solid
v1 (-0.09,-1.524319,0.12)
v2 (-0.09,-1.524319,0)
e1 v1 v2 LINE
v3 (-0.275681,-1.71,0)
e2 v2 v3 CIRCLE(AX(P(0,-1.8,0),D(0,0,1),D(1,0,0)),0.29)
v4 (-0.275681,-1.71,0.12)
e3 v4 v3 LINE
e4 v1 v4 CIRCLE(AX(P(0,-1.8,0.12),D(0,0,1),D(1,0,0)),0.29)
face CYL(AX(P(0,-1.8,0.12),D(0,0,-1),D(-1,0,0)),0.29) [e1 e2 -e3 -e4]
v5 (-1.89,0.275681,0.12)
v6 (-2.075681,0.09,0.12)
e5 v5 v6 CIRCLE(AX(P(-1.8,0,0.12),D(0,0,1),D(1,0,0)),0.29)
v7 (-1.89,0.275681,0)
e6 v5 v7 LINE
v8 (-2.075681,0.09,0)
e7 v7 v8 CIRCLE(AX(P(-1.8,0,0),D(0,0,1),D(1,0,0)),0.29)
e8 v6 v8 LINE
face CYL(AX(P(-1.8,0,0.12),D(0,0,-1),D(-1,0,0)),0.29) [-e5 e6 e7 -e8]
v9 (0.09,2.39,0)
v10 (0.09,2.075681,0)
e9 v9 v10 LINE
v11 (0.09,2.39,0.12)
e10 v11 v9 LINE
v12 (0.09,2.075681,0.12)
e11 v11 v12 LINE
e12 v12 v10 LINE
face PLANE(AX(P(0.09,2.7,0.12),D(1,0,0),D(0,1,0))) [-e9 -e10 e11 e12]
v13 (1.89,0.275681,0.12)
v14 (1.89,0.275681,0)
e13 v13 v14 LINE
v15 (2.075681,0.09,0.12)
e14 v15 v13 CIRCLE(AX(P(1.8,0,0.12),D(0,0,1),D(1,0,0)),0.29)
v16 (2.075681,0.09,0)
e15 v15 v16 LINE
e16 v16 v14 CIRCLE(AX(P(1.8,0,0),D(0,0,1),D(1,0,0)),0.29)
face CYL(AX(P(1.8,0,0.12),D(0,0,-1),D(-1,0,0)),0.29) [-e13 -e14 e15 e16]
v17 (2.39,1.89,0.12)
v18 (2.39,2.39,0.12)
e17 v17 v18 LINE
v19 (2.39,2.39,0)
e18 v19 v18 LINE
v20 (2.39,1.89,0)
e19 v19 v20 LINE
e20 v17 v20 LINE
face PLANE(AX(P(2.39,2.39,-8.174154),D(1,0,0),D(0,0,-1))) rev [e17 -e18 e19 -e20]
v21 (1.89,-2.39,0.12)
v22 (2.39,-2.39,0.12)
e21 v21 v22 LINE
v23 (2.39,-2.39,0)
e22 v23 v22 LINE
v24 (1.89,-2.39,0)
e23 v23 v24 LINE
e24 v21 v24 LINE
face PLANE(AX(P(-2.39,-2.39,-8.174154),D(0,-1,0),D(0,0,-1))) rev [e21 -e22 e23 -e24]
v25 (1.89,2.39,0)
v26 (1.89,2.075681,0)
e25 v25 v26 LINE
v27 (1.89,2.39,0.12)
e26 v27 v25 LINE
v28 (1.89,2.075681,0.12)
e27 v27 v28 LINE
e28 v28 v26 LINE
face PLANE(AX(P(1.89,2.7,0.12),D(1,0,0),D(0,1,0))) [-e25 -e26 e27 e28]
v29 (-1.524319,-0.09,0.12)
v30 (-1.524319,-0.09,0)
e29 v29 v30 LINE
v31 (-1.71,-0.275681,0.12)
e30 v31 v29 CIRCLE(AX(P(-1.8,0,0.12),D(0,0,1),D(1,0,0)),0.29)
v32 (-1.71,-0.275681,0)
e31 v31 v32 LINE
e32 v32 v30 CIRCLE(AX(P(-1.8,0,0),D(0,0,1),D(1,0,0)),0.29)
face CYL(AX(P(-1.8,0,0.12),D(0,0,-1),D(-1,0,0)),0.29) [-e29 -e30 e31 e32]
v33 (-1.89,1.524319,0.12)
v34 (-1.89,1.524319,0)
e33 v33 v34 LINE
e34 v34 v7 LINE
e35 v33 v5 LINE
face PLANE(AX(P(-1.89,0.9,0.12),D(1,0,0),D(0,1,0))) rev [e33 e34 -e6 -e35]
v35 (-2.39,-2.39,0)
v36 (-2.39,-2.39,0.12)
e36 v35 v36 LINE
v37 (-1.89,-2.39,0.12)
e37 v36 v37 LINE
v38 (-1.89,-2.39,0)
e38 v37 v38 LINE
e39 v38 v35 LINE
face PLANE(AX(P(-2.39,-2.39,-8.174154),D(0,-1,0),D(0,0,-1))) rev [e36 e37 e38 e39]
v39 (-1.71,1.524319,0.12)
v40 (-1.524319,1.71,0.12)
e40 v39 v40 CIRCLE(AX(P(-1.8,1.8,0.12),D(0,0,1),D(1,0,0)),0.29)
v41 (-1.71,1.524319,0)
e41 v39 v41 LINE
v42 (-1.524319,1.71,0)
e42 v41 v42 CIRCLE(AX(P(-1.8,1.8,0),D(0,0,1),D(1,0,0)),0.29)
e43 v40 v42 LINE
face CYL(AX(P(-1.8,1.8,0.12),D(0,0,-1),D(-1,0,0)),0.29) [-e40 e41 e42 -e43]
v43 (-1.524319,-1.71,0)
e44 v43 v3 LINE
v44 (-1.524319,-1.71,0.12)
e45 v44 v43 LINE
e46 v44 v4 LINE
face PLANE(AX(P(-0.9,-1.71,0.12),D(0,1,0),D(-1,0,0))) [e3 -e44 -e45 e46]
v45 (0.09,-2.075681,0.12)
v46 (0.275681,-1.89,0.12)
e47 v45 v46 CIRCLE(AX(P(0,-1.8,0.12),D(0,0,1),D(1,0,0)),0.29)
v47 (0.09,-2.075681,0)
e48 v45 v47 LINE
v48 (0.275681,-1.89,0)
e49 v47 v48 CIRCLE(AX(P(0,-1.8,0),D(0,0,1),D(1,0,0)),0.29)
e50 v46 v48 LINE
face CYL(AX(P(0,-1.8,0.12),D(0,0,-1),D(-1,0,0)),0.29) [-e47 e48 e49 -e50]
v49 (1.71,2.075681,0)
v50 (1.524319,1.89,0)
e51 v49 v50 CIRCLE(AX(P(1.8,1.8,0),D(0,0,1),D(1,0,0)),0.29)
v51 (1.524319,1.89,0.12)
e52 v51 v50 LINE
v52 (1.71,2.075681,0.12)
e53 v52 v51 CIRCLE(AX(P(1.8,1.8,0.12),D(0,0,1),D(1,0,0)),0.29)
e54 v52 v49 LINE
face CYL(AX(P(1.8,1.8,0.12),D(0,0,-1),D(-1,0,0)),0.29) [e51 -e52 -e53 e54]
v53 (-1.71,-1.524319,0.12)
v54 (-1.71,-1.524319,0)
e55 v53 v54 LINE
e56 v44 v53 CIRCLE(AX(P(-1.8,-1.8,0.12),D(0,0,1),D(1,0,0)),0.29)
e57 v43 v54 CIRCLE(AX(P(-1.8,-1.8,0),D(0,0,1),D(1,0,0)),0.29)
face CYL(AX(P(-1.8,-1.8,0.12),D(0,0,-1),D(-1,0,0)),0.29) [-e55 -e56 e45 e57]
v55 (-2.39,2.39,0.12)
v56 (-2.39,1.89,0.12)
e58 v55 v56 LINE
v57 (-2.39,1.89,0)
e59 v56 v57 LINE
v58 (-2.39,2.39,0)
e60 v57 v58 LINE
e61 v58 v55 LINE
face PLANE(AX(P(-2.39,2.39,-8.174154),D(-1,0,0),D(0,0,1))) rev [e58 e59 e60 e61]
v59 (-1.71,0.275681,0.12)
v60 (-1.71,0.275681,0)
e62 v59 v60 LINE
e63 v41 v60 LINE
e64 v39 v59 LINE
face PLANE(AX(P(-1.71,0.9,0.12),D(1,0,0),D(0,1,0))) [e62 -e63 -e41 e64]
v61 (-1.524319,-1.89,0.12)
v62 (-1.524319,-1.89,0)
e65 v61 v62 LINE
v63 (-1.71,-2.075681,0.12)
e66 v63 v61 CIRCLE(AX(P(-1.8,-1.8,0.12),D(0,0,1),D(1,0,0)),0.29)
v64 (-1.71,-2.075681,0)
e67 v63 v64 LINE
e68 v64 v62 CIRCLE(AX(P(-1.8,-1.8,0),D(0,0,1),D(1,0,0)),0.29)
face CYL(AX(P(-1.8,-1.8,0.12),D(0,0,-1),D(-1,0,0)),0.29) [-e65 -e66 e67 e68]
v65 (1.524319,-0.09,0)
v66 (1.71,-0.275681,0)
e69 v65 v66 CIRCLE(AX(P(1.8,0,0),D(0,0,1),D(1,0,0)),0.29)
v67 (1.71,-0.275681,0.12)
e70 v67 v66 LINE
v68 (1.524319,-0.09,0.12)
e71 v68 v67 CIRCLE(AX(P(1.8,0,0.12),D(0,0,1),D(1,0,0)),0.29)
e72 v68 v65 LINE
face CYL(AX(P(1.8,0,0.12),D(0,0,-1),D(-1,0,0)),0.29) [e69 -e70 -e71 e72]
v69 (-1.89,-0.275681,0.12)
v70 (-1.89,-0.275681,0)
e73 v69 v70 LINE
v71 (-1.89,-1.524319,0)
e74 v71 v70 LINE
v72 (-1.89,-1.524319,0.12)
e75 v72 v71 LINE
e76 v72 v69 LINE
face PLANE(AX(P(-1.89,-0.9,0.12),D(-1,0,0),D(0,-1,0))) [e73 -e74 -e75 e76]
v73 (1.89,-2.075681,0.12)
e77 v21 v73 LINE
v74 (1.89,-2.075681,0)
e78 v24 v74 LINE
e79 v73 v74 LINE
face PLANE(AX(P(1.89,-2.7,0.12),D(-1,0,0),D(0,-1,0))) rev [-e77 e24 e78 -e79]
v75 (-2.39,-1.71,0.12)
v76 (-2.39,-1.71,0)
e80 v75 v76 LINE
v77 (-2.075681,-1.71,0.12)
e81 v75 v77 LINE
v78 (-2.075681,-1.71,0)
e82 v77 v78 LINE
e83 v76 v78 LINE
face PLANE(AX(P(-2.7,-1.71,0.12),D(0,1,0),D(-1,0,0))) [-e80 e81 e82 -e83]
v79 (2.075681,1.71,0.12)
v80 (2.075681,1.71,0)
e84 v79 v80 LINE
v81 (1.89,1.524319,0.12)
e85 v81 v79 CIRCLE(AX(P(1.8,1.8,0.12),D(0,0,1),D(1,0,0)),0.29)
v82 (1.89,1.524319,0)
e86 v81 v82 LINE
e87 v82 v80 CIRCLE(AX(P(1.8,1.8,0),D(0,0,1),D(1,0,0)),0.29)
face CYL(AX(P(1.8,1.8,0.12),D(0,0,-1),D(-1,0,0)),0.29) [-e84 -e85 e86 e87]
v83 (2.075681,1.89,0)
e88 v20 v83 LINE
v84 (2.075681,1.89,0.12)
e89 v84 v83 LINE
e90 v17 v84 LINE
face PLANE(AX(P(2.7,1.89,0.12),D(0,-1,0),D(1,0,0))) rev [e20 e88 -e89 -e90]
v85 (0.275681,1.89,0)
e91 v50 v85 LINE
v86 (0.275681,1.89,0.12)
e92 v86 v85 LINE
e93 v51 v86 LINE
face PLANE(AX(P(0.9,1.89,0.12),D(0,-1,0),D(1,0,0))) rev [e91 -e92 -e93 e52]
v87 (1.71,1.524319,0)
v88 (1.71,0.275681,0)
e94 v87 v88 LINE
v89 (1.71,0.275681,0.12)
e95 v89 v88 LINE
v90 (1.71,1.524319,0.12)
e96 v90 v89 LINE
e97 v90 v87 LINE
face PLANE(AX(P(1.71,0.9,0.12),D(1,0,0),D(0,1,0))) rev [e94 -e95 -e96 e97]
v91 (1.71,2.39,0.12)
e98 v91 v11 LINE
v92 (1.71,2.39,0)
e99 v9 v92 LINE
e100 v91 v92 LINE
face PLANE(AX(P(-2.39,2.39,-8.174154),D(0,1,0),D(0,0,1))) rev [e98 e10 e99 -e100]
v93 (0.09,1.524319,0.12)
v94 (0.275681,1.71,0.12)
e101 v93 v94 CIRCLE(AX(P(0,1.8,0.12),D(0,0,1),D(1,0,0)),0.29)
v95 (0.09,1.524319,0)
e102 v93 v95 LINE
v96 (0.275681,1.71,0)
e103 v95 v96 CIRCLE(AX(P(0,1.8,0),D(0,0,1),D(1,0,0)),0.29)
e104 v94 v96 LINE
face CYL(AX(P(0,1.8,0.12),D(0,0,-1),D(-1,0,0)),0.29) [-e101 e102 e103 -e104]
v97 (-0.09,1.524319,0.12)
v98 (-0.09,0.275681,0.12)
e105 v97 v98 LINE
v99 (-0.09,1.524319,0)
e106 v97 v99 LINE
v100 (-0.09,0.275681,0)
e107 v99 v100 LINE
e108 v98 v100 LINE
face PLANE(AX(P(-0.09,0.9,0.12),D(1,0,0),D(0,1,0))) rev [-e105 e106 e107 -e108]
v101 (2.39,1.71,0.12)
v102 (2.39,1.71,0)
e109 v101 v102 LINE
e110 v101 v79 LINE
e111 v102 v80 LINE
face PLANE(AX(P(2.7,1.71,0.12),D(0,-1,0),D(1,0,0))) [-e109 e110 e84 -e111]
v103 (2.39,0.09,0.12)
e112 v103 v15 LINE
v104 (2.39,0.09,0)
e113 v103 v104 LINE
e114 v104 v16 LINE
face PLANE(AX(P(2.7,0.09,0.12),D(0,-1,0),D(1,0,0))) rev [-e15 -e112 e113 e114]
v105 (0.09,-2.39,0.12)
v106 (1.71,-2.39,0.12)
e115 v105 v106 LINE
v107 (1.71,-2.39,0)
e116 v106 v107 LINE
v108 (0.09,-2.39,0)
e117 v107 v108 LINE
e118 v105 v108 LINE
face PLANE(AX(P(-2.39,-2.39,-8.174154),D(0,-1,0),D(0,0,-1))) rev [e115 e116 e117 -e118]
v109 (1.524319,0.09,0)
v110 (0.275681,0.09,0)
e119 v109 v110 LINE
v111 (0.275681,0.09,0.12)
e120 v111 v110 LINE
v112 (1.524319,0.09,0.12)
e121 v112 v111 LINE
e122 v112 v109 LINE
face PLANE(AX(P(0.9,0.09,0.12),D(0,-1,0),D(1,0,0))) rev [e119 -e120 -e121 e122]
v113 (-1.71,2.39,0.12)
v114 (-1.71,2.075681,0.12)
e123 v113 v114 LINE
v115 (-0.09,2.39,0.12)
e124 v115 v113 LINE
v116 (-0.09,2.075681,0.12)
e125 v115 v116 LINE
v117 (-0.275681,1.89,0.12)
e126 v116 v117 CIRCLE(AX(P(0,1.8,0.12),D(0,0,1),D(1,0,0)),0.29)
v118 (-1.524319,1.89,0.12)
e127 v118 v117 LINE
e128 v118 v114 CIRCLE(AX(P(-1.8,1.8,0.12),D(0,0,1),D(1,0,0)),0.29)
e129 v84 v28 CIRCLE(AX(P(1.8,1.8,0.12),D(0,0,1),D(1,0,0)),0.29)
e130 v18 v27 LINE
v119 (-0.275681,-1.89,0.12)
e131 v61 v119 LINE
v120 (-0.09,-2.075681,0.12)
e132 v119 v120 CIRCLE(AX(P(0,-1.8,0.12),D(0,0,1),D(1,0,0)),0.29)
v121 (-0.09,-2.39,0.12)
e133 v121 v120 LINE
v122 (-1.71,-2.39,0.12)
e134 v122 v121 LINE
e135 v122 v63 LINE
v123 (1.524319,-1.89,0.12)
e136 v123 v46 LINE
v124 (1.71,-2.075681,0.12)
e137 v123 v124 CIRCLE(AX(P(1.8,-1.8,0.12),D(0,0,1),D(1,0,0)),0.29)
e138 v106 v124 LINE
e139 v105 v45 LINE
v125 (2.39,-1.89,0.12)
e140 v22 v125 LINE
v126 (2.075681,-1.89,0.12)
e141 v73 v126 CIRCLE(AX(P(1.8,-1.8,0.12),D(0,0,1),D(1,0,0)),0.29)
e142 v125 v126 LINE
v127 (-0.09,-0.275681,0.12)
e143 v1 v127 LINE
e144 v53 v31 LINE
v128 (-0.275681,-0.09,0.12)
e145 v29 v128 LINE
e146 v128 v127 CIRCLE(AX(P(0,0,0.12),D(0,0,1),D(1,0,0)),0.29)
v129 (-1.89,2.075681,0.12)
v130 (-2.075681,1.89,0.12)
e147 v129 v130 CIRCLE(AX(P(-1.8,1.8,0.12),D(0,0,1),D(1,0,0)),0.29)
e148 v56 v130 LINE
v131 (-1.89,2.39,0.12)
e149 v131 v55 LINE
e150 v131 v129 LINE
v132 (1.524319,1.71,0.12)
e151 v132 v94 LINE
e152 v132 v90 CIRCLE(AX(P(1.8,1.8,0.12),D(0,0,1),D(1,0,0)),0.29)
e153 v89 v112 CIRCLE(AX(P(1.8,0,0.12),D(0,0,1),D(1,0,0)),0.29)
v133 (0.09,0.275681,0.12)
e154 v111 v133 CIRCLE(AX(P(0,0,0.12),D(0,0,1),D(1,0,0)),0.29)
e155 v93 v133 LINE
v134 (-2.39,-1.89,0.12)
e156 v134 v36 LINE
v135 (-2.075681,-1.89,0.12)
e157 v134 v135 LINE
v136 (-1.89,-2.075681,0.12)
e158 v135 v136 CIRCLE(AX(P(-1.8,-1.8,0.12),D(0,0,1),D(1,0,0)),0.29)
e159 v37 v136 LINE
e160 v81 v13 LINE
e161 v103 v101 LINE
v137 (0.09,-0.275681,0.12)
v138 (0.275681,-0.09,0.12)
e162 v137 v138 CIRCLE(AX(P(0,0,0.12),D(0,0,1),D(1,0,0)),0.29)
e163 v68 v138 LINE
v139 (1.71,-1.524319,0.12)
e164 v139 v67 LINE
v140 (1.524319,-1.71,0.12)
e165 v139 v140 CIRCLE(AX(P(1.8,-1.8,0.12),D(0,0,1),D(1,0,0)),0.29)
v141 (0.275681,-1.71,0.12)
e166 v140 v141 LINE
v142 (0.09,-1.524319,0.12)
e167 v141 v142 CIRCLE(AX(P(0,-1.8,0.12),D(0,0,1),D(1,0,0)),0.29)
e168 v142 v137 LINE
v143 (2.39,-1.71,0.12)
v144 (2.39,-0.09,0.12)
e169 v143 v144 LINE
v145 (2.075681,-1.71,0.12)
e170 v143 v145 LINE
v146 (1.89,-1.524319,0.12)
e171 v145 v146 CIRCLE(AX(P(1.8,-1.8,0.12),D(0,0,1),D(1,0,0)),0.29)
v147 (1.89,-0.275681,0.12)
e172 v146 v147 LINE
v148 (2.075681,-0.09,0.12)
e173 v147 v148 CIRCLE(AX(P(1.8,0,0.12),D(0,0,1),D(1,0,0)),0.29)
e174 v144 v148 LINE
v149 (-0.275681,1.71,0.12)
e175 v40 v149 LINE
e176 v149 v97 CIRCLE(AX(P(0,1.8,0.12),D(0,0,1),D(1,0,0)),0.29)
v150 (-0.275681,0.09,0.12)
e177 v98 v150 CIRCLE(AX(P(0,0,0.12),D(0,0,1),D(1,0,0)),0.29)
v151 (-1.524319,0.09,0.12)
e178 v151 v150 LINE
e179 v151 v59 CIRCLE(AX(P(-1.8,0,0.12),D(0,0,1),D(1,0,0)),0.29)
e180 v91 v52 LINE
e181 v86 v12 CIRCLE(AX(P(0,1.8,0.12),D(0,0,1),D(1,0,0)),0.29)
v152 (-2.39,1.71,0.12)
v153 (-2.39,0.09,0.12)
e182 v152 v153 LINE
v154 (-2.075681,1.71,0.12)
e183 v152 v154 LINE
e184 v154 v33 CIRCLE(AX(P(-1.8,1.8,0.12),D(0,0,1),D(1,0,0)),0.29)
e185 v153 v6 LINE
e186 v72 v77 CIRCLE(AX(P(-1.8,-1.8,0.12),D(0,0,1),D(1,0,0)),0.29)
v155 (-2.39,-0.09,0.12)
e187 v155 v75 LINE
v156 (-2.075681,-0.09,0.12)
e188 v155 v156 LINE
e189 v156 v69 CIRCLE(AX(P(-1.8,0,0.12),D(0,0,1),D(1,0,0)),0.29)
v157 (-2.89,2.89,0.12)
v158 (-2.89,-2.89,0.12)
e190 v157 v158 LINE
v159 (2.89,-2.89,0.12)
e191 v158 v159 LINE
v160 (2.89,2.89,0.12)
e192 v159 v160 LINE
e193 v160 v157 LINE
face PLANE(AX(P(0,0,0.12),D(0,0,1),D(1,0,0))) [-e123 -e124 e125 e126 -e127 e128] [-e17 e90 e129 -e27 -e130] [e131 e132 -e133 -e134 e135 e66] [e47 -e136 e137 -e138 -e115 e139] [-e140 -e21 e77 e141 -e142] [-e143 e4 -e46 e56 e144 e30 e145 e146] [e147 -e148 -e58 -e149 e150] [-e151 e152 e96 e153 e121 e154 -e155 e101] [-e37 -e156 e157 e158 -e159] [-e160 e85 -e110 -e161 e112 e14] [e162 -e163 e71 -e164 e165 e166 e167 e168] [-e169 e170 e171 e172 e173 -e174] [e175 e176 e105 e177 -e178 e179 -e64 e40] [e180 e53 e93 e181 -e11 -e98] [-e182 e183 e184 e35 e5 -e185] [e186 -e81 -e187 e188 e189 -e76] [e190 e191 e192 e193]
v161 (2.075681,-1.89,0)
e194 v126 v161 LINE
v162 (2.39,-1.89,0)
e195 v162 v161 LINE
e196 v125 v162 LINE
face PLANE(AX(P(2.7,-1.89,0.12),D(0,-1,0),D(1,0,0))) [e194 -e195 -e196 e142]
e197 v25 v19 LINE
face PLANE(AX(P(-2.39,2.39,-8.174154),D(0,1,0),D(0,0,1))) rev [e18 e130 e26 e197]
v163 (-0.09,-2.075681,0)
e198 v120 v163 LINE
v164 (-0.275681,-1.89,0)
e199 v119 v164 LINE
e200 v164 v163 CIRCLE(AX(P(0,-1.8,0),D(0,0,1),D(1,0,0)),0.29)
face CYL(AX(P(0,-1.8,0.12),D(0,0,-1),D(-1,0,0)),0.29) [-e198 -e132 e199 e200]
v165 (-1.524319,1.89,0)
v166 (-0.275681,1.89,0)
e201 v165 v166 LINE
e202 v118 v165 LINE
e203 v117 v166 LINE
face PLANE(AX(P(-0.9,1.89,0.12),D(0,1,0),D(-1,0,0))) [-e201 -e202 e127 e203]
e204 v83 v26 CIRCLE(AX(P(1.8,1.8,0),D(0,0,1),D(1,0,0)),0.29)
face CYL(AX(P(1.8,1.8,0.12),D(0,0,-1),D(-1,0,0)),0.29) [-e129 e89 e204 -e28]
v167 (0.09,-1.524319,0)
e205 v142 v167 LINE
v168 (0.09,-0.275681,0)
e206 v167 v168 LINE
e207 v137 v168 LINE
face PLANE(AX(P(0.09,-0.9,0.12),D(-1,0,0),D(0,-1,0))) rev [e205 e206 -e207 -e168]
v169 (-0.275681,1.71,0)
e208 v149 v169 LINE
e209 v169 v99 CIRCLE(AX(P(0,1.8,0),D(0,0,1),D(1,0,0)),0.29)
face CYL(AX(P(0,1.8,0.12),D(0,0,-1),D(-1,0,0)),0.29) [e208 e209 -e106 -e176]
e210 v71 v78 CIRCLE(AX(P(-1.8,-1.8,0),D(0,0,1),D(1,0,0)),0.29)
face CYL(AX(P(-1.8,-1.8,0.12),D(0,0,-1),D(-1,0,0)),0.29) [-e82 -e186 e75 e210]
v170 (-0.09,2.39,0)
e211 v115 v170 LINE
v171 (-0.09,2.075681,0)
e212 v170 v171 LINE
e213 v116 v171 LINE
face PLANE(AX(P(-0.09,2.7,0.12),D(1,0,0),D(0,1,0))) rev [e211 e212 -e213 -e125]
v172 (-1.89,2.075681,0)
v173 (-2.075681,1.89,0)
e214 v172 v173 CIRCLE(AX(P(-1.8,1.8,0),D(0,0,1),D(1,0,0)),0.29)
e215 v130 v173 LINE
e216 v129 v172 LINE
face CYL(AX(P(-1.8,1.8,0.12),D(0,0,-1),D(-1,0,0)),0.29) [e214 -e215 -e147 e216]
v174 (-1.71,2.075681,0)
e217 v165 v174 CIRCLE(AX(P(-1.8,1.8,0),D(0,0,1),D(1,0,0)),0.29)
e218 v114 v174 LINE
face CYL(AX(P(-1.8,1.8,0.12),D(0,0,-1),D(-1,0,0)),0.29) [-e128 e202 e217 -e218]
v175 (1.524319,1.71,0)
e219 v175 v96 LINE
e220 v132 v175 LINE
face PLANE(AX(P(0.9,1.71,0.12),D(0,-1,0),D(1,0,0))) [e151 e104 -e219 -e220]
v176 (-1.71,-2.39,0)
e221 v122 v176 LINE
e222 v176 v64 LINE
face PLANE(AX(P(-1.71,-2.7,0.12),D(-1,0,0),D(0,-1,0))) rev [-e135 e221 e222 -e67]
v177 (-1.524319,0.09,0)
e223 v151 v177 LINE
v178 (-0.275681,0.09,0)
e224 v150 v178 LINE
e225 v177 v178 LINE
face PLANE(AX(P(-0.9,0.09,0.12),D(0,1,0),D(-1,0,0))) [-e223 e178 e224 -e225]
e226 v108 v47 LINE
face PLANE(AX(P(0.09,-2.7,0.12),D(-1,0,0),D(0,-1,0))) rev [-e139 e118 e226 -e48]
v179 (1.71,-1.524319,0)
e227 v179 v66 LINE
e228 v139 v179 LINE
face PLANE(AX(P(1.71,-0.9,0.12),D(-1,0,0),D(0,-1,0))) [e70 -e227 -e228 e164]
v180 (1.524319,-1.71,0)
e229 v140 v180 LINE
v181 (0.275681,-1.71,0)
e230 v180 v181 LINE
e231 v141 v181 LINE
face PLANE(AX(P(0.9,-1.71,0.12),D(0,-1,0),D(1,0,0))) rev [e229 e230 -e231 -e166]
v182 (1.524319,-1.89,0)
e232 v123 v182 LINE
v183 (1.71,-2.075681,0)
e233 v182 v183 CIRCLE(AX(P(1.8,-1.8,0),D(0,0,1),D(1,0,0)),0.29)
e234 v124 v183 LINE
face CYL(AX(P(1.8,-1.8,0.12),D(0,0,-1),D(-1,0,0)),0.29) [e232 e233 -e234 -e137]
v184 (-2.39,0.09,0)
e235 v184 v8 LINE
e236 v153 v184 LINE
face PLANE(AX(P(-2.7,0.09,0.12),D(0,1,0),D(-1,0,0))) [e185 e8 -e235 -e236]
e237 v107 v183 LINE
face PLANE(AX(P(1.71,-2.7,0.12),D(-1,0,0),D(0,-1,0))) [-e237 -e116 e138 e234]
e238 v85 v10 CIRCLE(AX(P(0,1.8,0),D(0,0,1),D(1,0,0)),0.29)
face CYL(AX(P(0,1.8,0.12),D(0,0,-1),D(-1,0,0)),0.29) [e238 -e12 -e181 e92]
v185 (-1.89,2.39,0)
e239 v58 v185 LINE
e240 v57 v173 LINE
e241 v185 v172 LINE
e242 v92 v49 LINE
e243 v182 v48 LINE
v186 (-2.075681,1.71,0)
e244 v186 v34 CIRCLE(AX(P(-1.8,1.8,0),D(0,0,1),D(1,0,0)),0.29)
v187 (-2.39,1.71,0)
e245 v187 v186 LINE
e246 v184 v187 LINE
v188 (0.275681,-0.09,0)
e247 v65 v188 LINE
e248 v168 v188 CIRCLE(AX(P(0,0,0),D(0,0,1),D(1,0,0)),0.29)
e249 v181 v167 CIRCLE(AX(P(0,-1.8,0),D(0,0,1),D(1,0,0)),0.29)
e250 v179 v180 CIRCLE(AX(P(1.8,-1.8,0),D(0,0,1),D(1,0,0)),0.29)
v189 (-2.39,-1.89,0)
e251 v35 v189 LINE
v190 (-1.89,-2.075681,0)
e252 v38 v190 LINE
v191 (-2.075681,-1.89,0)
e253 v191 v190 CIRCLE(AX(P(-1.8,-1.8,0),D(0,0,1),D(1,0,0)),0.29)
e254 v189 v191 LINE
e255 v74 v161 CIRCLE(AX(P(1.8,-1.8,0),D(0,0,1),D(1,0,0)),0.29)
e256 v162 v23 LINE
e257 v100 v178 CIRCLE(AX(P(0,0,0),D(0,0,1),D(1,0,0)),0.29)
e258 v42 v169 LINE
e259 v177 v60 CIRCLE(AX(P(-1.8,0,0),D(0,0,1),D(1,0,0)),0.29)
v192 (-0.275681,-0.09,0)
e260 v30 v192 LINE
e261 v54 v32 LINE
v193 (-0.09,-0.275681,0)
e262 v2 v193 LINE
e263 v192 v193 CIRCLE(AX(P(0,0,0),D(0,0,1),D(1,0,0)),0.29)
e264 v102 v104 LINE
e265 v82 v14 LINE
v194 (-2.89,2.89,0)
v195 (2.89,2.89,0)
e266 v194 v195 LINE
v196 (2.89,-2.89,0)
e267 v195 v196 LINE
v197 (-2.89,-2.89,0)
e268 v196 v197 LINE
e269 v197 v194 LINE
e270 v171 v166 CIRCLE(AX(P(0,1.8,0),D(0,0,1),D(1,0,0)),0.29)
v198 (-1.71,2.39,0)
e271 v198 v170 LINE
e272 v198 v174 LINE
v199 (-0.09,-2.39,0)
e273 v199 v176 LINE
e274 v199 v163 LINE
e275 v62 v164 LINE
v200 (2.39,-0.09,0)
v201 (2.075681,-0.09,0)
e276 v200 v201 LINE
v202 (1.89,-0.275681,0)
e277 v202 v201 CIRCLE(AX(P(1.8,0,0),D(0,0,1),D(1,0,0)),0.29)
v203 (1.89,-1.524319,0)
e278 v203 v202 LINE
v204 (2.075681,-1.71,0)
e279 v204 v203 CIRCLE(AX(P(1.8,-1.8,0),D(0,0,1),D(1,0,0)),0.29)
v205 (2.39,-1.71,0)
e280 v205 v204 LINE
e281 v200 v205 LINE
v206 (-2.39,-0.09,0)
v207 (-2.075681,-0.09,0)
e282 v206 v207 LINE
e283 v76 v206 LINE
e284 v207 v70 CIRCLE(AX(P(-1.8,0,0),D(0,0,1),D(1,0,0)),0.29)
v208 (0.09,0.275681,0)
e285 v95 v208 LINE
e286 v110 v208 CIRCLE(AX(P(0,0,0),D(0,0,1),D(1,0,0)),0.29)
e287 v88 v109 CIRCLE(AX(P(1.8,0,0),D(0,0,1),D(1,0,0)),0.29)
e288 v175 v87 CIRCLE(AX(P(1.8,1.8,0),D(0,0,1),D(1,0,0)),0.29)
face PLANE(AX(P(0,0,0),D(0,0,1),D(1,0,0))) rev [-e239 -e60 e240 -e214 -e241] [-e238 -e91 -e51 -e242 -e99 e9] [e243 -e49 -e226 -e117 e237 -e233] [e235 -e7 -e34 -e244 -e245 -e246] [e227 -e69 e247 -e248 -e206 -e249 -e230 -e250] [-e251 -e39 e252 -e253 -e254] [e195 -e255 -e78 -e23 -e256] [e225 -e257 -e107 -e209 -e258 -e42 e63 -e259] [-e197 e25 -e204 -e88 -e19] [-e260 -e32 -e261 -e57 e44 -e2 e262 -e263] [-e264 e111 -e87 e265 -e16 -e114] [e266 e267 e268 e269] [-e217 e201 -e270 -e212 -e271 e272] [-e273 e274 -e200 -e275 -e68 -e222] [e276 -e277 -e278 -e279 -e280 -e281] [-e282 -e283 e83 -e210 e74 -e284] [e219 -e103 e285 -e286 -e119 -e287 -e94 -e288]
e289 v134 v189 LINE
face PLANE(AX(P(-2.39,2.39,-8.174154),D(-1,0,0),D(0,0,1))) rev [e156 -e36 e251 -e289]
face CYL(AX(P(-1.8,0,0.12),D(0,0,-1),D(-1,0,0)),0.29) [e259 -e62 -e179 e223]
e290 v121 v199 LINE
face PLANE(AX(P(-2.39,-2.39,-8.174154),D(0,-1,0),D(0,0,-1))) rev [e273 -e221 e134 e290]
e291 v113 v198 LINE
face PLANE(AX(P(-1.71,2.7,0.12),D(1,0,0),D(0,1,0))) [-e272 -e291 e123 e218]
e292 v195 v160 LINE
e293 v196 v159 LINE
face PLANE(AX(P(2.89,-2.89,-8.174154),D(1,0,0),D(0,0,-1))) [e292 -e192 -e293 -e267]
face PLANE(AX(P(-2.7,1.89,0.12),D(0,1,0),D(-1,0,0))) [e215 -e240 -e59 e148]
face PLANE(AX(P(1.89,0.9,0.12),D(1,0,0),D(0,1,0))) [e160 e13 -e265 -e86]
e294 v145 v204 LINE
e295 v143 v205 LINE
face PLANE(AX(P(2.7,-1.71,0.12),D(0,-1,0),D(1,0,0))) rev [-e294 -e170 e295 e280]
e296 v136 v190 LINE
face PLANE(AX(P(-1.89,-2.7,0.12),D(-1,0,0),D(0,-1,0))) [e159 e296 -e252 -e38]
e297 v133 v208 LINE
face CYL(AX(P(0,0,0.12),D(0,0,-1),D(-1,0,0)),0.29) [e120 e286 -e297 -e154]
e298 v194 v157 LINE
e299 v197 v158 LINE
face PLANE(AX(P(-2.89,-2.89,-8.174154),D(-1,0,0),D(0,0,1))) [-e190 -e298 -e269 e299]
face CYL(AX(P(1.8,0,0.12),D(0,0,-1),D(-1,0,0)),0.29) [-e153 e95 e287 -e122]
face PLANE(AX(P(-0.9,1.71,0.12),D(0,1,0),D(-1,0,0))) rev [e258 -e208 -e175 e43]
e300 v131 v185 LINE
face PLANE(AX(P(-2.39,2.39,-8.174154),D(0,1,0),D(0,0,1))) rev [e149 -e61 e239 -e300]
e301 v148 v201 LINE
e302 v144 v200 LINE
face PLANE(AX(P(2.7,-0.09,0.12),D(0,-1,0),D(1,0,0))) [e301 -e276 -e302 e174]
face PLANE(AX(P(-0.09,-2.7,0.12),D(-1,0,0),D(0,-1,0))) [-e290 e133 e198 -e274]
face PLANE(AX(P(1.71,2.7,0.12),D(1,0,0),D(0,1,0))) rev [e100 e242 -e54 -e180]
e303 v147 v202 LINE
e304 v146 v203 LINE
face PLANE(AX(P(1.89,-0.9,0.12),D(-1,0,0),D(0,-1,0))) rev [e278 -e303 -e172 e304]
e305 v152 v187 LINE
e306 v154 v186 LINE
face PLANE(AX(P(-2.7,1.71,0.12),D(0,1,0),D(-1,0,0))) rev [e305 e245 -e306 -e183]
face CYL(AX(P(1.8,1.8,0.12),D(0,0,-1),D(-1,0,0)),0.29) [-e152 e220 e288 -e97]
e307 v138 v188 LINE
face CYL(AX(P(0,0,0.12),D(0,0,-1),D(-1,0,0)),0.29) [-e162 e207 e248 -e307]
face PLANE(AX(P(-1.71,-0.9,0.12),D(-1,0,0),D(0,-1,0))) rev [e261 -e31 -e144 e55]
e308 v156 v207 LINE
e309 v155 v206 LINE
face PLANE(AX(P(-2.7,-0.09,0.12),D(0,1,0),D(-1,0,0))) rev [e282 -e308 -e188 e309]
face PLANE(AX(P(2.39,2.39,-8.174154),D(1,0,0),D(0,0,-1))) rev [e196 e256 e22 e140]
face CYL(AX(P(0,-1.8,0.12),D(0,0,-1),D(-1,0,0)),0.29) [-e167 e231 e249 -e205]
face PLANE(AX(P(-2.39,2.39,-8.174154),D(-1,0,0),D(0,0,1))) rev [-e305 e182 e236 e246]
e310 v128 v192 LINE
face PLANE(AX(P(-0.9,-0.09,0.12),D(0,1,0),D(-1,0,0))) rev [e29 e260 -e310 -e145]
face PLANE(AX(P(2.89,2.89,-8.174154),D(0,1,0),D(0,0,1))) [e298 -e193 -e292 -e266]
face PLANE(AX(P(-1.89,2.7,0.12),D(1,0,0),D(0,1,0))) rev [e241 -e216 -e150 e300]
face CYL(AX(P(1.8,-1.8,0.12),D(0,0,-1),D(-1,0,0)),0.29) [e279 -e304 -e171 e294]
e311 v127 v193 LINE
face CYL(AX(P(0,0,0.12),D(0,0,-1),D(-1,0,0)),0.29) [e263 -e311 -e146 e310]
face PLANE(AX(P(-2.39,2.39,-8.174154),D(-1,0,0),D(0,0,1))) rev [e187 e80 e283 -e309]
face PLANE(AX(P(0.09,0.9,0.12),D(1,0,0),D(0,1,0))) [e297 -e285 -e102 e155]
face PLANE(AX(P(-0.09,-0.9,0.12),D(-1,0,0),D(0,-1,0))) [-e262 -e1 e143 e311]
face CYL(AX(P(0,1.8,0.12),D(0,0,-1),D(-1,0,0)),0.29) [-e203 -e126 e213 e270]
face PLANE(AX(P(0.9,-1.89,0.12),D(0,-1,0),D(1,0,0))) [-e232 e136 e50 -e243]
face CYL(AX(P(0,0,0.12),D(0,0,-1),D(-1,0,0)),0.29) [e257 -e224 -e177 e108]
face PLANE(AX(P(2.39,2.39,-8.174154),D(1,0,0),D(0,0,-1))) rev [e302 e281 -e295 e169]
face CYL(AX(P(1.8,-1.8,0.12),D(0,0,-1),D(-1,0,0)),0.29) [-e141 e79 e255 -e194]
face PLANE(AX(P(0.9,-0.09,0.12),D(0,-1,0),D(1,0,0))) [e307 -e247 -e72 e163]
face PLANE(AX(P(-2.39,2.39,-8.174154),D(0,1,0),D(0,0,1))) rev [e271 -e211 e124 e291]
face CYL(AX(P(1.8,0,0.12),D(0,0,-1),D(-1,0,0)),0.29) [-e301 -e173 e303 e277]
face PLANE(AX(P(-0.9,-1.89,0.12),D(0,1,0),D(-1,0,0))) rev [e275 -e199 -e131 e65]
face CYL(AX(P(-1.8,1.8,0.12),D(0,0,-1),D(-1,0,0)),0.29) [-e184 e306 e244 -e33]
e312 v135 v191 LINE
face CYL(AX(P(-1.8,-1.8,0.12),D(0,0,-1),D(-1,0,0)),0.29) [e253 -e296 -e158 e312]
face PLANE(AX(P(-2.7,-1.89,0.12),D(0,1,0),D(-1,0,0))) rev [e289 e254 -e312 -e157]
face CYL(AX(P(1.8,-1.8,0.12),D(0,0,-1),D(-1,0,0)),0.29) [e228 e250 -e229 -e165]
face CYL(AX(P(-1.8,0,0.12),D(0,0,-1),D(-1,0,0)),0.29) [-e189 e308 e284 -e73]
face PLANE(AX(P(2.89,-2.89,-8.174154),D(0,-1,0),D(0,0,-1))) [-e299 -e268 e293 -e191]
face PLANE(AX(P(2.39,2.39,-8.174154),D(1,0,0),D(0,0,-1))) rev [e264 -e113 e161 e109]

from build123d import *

# Parameters (mm, degrees)
BOSS_EXTRUDE2_DEPTH        = 0.12
CIRPATTERN2_COUNT          = 4
LPATTERN5_COUNT            = 2
LPATTERN5_PITCH            = 1.8
LPATTERN5_COPY_1_DEPTH     = 0.12
LPATTERN5_COPY_2_DEPTH     = 0.12
LPATTERN5_COPY_3_DEPTH     = 0.12
LPATTERN5_COL_COUNT        = 2
LPATTERN5_COL_PITCH        = 1.8
LPATTERN5_COL_COPY_1_DEPTH = 0.12
LPATTERN5_COL_COPY_2_DEPTH = 0.12
LPATTERN5_COL_COPY_3_DEPTH = 0.12
LPATTERN6_DEPTH            = 0.12
SKETCH3_W                  = 8
SKETCH3_H                  = 8
SKETCH3_W_2                = 4.78
SKETCH3_H_2                = 4.78
CUT_EXTRUDE8_DEPTH         = 4.820261771
SKETCH7_W                  = 5.78
SKETCH7_H                  = 5.78
SKETCH7_W_2                = 4.78
SKETCH7_H_2                = 4.78
BOSS_EXTRUDE3_DEPTH        = 0.12


# Read off the part's stored shape, not the designer's step: LPattern6
with BuildPart() as part:
    # Sketch2 → Boss-Extrude2 (new body)
    with BuildSketch(Plane.XY):
        with BuildLine():
            Line((0.09, 0.9), (0.09, 0.275680975))
            ThreePointArc((0.09, 0.275680975), (0, -0.29), (-0.09, 0.275680975))
            Line((-0.09, 0.275680975), (-0.09, 0.9))
            Line((-0.09, 0.9), (0.09, 0.9))
        make_face()
    boss_extrude2 = extrude(amount=BOSS_EXTRUDE2_DEPTH)

    # CirPattern2: Boss-Extrude2 ×4 about axis
    cirpattern2_axis = Axis((0, 0, 0), (0, 0, 1))
    for i in range(1, CIRPATTERN2_COUNT):
        add(boss_extrude2.rotate(cirpattern2_axis, i * 360 / CIRPATTERN2_COUNT))



with BuildPart() as lpattern5_1:
    # LPattern5: Boss-Extrude2 ×2
    with Locations(*[(0, i * LPATTERN5_PITCH, 0) for i in range(1, LPATTERN5_COUNT)]):
        add(boss_extrude2)

    # LPattern5 copy 1 sketch → LPattern5 copy 1 (add)
    with BuildSketch(Plane(origin=(0, 1.8, 0), x_dir=(0, 1, 0), z_dir=(0, 0, 1))):
        with BuildLine():
            Line((0.09, 0.9), (0.09, 0.275680975))
            ThreePointArc((0.09, 0.275680975), (0, -0.29), (-0.09, 0.275680975))
            Line((-0.09, 0.275680975), (-0.09, 0.9))
            Line((-0.09, 0.9), (0.09, 0.9))
        make_face()
    extrude(amount=LPATTERN5_COPY_1_DEPTH)


with BuildPart() as part_1:
    add(part.part)

    add(lpattern5_1.part)  # LPattern5 copy 2 merges LPattern5_1
    # LPattern5 copy 2 sketch → LPattern5 copy 2 (add)
    with BuildSketch(Plane(origin=(0, 1.8, 0), x_dir=(-1, 0, 0), z_dir=(0, 0, 1))):
        with BuildLine():
            Line((0.09, 0.9), (0.09, 0.275680975))
            ThreePointArc((0.09, 0.275680975), (0, -0.29), (-0.09, 0.275680975))
            Line((-0.09, 0.275680975), (-0.09, 0.9))
            Line((-0.09, 0.9), (0.09, 0.9))
        make_face()
    extrude(amount=LPATTERN5_COPY_2_DEPTH)

    # LPattern5 copy 3 sketch → LPattern5 copy 3 (add)
    with BuildSketch(Plane(origin=(0, 1.8, 0), x_dir=(0, -1, 0), z_dir=(0, 0, 1))):
        with BuildLine():
            Line((0.09, 0.9), (0.09, 0.275680975))
            ThreePointArc((0.09, 0.275680975), (0, -0.29), (-0.09, 0.275680975))
            Line((-0.09, 0.275680975), (-0.09, 0.9))
            Line((-0.09, 0.9), (0.09, 0.9))
        make_face()
    extrude(amount=LPATTERN5_COPY_3_DEPTH)

    # LPattern5 col: Boss-Extrude2 ×2
    with Locations(*[(0, -i * LPATTERN5_COL_PITCH, 0) for i in range(1, LPATTERN5_COL_COUNT)]):
        add(boss_extrude2)

    # LPattern5 col copy 1 sketch → LPattern5 col copy 1 (add)
    with BuildSketch(Plane(origin=(0, -1.8, 0), x_dir=(0, 1, 0), z_dir=(0, 0, 1))):
        with BuildLine():
            Line((0.09, 0.9), (0.09, 0.275680975))
            ThreePointArc((0.09, 0.275680975), (0, -0.29), (-0.09, 0.275680975))
            Line((-0.09, 0.275680975), (-0.09, 0.9))
            Line((-0.09, 0.9), (0.09, 0.9))
        make_face()
    extrude(amount=LPATTERN5_COL_COPY_1_DEPTH)

    # LPattern5 col copy 2 sketch → LPattern5 col copy 2 (add)
    with BuildSketch(Plane(origin=(0, -1.8, 0), x_dir=(-1, 0, 0), z_dir=(0, 0, 1))):
        with BuildLine():
            Line((0.09, 0.9), (0.09, 0.275680975))
            ThreePointArc((0.09, 0.275680975), (0, -0.29), (-0.09, 0.275680975))
            Line((-0.09, 0.275680975), (-0.09, 0.9))
            Line((-0.09, 0.9), (0.09, 0.9))
        make_face()
    extrude(amount=LPATTERN5_COL_COPY_2_DEPTH)

    # LPattern5 col copy 3 sketch → LPattern5 col copy 3 (add)
    with BuildSketch(Plane(origin=(0, -1.8, 0), x_dir=(0, -1, 0), z_dir=(0, 0, 1))):
        with BuildLine():
            Line((0.09, 0.9), (0.09, 0.275680975))
            ThreePointArc((0.09, 0.275680975), (0, -0.29), (-0.09, 0.275680975))
            Line((-0.09, 0.275680975), (-0.09, 0.9))
            Line((-0.09, 0.9), (0.09, 0.9))
        make_face()
    extrude(amount=LPATTERN5_COL_COPY_3_DEPTH)

    # LPattern6 outline → LPattern6 (add)
    with BuildSketch(Plane.XY):
        with BuildLine():
            Line((1.524319025, 0.09), (0.9, 0.09))
            Line((0.9, 0.09), (0.9, -0.09))
            Line((0.9, -0.09), (1.524319025, -0.09))
            ThreePointArc((1.524319025, -0.09), (1.594939033, -0.205060967), (1.71, -0.275680975))
            Line((1.71, -0.275680975), (1.71, -1.524319025))
            ThreePointArc((1.71, -1.524319025), (1.594939033, -1.594939033), (1.524319025, -1.71))
            Line((1.524319025, -1.71), (0.9, -1.71))
            Line((0.9, -1.71), (0.9, -1.89))
            Line((0.9, -1.89), (1.524319025, -1.89))
            ThreePointArc((1.524319025, -1.89), (1.594939033, -2.005060967), (1.71, -2.075680975))
            Line((1.71, -2.075680975), (1.71, -2.7))
            Line((1.71, -2.7), (1.89, -2.7))
            Line((1.89, -2.7), (1.89, -2.075680975))
            ThreePointArc((1.89, -2.075680975), (2.005060967, -2.005060967), (2.075680975, -1.89))
            Line((2.075680975, -1.89), (2.7, -1.89))
            Line((2.7, -1.89), (2.7, -1.71))
            Line((2.7, -1.71), (2.075680975, -1.71))
            ThreePointArc((2.075680975, -1.71), (2.005060967, -1.594939033), (1.89, -1.524319025))
            Line((1.89, -1.524319025), (1.89, -0.275680975))
            ThreePointArc((1.89, -0.275680975), (2.005060967, -0.205060967), (2.075680975, -0.09))
            Line((2.075680975, -0.09), (2.7, -0.09))
            Line((2.7, -0.09), (2.7, 0.09))
            Line((2.7, 0.09), (2.075680975, 0.09))
            ThreePointArc((2.075680975, 0.09), (2.005060967, 0.205060967), (1.89, 0.275680975))
            Line((1.89, 0.275680975), (1.89, 1.524319025))
            ThreePointArc((1.89, 1.524319025), (2.005060967, 1.594939033), (2.075680975, 1.71))
            Line((2.075680975, 1.71), (2.7, 1.71))
            Line((2.7, 1.71), (2.7, 1.89))
            Line((2.7, 1.89), (2.075680975, 1.89))
            ThreePointArc((2.075680975, 1.89), (2.005060967, 2.005060967), (1.89, 2.075680975))
            Line((1.89, 2.075680975), (1.89, 2.7))
            Line((1.89, 2.7), (1.71, 2.7))
            Line((1.71, 2.7), (1.71, 2.075680975))
            ThreePointArc((1.71, 2.075680975), (1.594939033, 2.005060967), (1.524319025, 1.89))
            Line((1.524319025, 1.89), (0.9, 1.89))
            Line((0.9, 1.89), (0.9, 1.71))
            Line((0.9, 1.71), (1.524319025, 1.71))
            ThreePointArc((1.524319025, 1.71), (1.594939033, 1.594939033), (1.71, 1.524319025))
            Line((1.71, 1.524319025), (1.71, 0.275680975))
            ThreePointArc((1.71, 0.275680975), (1.594939033, 0.205060967), (1.524319025, 0.09))
        make_face()
        with BuildLine():
            Line((-0.9, -0.09), (-0.9, 0.09))
            Line((-0.9, 0.09), (-1.524319025, 0.09))
            ThreePointArc((-1.524319025, 0.09), (-1.594939033, 0.205060967), (-1.71, 0.275680975))
            Line((-1.71, 0.275680975), (-1.71, 1.524319025))
            ThreePointArc((-1.71, 1.524319025), (-1.594939033, 1.594939033), (-1.524319025, 1.71))
            Line((-1.524319025, 1.71), (-0.9, 1.71))
            Line((-0.9, 1.71), (-0.9, 1.89))
            Line((-0.9, 1.89), (-1.524319025, 1.89))
            ThreePointArc((-1.524319025, 1.89), (-1.594939033, 2.005060967), (-1.71, 2.075680975))
            Line((-1.71, 2.075680975), (-1.71, 2.7))
            Line((-1.71, 2.7), (-1.89, 2.7))
            Line((-1.89, 2.7), (-1.89, 2.075680975))
            ThreePointArc((-1.89, 2.075680975), (-2.005060967, 2.005060967), (-2.075680975, 1.89))
            Line((-2.075680975, 1.89), (-2.7, 1.89))
            Line((-2.7, 1.89), (-2.7, 1.71))
            Line((-2.7, 1.71), (-2.075680975, 1.71))
            ThreePointArc((-2.075680975, 1.71), (-2.005060967, 1.594939033), (-1.89, 1.524319025))
            Line((-1.89, 1.524319025), (-1.89, 0.275680975))
            ThreePointArc((-1.89, 0.275680975), (-2.005060967, 0.205060967), (-2.075680975, 0.09))
            Line((-2.075680975, 0.09), (-2.7, 0.09))
            Line((-2.7, 0.09), (-2.7, -0.09))
            Line((-2.7, -0.09), (-2.075680975, -0.09))
            ThreePointArc((-2.075680975, -0.09), (-2.005060967, -0.205060967), (-1.89, -0.275680975))
            Line((-1.89, -0.275680975), (-1.89, -1.524319025))
            ThreePointArc((-1.89, -1.524319025), (-2.005060967, -1.594939033), (-2.075680975, -1.71))
            Line((-2.075680975, -1.71), (-2.7, -1.71))
            Line((-2.7, -1.71), (-2.7, -1.89))
            Line((-2.7, -1.89), (-2.075680975, -1.89))
            ThreePointArc((-2.075680975, -1.89), (-2.005060967, -2.005060967), (-1.89, -2.075680975))
            Line((-1.89, -2.075680975), (-1.89, -2.7))
            Line((-1.89, -2.7), (-1.71, -2.7))
            Line((-1.71, -2.7), (-1.71, -2.075680975))
            ThreePointArc((-1.71, -2.075680975), (-1.594939033, -2.005060967), (-1.524319025, -1.89))
            Line((-1.524319025, -1.89), (-0.9, -1.89))
            Line((-0.9, -1.89), (-0.9, -1.71))
            Line((-0.9, -1.71), (-1.524319025, -1.71))
            ThreePointArc((-1.524319025, -1.71), (-1.594939033, -1.594939033), (-1.71, -1.524319025))
            Line((-1.71, -1.524319025), (-1.71, -0.275680975))
            ThreePointArc((-1.71, -0.275680975), (-1.594939033, -0.205060967), (-1.524319025, -0.09))
            Line((-1.524319025, -0.09), (-0.9, -0.09))
        make_face()
    extrude(amount=LPATTERN6_DEPTH)

    # Sketch3 → Cut-Extrude8 (cut, through all)
    with BuildSketch(Plane.XY):
        Rectangle(SKETCH3_W, SKETCH3_H)
        Rectangle(SKETCH3_W_2, SKETCH3_H_2, mode=Mode.SUBTRACT)
    extrude(amount=CUT_EXTRUDE8_DEPTH, mode=Mode.SUBTRACT)

    # Sketch7 → Boss-Extrude3 (add)
    with BuildSketch(Plane.XY.offset(0.12)):
        Rectangle(SKETCH7_W, SKETCH7_H)
        Rectangle(SKETCH7_W_2, SKETCH7_H_2, mode=Mode.SUBTRACT)
    extrude(amount=-BOSS_EXTRUDE3_DEPTH)


solid = part_1.part
